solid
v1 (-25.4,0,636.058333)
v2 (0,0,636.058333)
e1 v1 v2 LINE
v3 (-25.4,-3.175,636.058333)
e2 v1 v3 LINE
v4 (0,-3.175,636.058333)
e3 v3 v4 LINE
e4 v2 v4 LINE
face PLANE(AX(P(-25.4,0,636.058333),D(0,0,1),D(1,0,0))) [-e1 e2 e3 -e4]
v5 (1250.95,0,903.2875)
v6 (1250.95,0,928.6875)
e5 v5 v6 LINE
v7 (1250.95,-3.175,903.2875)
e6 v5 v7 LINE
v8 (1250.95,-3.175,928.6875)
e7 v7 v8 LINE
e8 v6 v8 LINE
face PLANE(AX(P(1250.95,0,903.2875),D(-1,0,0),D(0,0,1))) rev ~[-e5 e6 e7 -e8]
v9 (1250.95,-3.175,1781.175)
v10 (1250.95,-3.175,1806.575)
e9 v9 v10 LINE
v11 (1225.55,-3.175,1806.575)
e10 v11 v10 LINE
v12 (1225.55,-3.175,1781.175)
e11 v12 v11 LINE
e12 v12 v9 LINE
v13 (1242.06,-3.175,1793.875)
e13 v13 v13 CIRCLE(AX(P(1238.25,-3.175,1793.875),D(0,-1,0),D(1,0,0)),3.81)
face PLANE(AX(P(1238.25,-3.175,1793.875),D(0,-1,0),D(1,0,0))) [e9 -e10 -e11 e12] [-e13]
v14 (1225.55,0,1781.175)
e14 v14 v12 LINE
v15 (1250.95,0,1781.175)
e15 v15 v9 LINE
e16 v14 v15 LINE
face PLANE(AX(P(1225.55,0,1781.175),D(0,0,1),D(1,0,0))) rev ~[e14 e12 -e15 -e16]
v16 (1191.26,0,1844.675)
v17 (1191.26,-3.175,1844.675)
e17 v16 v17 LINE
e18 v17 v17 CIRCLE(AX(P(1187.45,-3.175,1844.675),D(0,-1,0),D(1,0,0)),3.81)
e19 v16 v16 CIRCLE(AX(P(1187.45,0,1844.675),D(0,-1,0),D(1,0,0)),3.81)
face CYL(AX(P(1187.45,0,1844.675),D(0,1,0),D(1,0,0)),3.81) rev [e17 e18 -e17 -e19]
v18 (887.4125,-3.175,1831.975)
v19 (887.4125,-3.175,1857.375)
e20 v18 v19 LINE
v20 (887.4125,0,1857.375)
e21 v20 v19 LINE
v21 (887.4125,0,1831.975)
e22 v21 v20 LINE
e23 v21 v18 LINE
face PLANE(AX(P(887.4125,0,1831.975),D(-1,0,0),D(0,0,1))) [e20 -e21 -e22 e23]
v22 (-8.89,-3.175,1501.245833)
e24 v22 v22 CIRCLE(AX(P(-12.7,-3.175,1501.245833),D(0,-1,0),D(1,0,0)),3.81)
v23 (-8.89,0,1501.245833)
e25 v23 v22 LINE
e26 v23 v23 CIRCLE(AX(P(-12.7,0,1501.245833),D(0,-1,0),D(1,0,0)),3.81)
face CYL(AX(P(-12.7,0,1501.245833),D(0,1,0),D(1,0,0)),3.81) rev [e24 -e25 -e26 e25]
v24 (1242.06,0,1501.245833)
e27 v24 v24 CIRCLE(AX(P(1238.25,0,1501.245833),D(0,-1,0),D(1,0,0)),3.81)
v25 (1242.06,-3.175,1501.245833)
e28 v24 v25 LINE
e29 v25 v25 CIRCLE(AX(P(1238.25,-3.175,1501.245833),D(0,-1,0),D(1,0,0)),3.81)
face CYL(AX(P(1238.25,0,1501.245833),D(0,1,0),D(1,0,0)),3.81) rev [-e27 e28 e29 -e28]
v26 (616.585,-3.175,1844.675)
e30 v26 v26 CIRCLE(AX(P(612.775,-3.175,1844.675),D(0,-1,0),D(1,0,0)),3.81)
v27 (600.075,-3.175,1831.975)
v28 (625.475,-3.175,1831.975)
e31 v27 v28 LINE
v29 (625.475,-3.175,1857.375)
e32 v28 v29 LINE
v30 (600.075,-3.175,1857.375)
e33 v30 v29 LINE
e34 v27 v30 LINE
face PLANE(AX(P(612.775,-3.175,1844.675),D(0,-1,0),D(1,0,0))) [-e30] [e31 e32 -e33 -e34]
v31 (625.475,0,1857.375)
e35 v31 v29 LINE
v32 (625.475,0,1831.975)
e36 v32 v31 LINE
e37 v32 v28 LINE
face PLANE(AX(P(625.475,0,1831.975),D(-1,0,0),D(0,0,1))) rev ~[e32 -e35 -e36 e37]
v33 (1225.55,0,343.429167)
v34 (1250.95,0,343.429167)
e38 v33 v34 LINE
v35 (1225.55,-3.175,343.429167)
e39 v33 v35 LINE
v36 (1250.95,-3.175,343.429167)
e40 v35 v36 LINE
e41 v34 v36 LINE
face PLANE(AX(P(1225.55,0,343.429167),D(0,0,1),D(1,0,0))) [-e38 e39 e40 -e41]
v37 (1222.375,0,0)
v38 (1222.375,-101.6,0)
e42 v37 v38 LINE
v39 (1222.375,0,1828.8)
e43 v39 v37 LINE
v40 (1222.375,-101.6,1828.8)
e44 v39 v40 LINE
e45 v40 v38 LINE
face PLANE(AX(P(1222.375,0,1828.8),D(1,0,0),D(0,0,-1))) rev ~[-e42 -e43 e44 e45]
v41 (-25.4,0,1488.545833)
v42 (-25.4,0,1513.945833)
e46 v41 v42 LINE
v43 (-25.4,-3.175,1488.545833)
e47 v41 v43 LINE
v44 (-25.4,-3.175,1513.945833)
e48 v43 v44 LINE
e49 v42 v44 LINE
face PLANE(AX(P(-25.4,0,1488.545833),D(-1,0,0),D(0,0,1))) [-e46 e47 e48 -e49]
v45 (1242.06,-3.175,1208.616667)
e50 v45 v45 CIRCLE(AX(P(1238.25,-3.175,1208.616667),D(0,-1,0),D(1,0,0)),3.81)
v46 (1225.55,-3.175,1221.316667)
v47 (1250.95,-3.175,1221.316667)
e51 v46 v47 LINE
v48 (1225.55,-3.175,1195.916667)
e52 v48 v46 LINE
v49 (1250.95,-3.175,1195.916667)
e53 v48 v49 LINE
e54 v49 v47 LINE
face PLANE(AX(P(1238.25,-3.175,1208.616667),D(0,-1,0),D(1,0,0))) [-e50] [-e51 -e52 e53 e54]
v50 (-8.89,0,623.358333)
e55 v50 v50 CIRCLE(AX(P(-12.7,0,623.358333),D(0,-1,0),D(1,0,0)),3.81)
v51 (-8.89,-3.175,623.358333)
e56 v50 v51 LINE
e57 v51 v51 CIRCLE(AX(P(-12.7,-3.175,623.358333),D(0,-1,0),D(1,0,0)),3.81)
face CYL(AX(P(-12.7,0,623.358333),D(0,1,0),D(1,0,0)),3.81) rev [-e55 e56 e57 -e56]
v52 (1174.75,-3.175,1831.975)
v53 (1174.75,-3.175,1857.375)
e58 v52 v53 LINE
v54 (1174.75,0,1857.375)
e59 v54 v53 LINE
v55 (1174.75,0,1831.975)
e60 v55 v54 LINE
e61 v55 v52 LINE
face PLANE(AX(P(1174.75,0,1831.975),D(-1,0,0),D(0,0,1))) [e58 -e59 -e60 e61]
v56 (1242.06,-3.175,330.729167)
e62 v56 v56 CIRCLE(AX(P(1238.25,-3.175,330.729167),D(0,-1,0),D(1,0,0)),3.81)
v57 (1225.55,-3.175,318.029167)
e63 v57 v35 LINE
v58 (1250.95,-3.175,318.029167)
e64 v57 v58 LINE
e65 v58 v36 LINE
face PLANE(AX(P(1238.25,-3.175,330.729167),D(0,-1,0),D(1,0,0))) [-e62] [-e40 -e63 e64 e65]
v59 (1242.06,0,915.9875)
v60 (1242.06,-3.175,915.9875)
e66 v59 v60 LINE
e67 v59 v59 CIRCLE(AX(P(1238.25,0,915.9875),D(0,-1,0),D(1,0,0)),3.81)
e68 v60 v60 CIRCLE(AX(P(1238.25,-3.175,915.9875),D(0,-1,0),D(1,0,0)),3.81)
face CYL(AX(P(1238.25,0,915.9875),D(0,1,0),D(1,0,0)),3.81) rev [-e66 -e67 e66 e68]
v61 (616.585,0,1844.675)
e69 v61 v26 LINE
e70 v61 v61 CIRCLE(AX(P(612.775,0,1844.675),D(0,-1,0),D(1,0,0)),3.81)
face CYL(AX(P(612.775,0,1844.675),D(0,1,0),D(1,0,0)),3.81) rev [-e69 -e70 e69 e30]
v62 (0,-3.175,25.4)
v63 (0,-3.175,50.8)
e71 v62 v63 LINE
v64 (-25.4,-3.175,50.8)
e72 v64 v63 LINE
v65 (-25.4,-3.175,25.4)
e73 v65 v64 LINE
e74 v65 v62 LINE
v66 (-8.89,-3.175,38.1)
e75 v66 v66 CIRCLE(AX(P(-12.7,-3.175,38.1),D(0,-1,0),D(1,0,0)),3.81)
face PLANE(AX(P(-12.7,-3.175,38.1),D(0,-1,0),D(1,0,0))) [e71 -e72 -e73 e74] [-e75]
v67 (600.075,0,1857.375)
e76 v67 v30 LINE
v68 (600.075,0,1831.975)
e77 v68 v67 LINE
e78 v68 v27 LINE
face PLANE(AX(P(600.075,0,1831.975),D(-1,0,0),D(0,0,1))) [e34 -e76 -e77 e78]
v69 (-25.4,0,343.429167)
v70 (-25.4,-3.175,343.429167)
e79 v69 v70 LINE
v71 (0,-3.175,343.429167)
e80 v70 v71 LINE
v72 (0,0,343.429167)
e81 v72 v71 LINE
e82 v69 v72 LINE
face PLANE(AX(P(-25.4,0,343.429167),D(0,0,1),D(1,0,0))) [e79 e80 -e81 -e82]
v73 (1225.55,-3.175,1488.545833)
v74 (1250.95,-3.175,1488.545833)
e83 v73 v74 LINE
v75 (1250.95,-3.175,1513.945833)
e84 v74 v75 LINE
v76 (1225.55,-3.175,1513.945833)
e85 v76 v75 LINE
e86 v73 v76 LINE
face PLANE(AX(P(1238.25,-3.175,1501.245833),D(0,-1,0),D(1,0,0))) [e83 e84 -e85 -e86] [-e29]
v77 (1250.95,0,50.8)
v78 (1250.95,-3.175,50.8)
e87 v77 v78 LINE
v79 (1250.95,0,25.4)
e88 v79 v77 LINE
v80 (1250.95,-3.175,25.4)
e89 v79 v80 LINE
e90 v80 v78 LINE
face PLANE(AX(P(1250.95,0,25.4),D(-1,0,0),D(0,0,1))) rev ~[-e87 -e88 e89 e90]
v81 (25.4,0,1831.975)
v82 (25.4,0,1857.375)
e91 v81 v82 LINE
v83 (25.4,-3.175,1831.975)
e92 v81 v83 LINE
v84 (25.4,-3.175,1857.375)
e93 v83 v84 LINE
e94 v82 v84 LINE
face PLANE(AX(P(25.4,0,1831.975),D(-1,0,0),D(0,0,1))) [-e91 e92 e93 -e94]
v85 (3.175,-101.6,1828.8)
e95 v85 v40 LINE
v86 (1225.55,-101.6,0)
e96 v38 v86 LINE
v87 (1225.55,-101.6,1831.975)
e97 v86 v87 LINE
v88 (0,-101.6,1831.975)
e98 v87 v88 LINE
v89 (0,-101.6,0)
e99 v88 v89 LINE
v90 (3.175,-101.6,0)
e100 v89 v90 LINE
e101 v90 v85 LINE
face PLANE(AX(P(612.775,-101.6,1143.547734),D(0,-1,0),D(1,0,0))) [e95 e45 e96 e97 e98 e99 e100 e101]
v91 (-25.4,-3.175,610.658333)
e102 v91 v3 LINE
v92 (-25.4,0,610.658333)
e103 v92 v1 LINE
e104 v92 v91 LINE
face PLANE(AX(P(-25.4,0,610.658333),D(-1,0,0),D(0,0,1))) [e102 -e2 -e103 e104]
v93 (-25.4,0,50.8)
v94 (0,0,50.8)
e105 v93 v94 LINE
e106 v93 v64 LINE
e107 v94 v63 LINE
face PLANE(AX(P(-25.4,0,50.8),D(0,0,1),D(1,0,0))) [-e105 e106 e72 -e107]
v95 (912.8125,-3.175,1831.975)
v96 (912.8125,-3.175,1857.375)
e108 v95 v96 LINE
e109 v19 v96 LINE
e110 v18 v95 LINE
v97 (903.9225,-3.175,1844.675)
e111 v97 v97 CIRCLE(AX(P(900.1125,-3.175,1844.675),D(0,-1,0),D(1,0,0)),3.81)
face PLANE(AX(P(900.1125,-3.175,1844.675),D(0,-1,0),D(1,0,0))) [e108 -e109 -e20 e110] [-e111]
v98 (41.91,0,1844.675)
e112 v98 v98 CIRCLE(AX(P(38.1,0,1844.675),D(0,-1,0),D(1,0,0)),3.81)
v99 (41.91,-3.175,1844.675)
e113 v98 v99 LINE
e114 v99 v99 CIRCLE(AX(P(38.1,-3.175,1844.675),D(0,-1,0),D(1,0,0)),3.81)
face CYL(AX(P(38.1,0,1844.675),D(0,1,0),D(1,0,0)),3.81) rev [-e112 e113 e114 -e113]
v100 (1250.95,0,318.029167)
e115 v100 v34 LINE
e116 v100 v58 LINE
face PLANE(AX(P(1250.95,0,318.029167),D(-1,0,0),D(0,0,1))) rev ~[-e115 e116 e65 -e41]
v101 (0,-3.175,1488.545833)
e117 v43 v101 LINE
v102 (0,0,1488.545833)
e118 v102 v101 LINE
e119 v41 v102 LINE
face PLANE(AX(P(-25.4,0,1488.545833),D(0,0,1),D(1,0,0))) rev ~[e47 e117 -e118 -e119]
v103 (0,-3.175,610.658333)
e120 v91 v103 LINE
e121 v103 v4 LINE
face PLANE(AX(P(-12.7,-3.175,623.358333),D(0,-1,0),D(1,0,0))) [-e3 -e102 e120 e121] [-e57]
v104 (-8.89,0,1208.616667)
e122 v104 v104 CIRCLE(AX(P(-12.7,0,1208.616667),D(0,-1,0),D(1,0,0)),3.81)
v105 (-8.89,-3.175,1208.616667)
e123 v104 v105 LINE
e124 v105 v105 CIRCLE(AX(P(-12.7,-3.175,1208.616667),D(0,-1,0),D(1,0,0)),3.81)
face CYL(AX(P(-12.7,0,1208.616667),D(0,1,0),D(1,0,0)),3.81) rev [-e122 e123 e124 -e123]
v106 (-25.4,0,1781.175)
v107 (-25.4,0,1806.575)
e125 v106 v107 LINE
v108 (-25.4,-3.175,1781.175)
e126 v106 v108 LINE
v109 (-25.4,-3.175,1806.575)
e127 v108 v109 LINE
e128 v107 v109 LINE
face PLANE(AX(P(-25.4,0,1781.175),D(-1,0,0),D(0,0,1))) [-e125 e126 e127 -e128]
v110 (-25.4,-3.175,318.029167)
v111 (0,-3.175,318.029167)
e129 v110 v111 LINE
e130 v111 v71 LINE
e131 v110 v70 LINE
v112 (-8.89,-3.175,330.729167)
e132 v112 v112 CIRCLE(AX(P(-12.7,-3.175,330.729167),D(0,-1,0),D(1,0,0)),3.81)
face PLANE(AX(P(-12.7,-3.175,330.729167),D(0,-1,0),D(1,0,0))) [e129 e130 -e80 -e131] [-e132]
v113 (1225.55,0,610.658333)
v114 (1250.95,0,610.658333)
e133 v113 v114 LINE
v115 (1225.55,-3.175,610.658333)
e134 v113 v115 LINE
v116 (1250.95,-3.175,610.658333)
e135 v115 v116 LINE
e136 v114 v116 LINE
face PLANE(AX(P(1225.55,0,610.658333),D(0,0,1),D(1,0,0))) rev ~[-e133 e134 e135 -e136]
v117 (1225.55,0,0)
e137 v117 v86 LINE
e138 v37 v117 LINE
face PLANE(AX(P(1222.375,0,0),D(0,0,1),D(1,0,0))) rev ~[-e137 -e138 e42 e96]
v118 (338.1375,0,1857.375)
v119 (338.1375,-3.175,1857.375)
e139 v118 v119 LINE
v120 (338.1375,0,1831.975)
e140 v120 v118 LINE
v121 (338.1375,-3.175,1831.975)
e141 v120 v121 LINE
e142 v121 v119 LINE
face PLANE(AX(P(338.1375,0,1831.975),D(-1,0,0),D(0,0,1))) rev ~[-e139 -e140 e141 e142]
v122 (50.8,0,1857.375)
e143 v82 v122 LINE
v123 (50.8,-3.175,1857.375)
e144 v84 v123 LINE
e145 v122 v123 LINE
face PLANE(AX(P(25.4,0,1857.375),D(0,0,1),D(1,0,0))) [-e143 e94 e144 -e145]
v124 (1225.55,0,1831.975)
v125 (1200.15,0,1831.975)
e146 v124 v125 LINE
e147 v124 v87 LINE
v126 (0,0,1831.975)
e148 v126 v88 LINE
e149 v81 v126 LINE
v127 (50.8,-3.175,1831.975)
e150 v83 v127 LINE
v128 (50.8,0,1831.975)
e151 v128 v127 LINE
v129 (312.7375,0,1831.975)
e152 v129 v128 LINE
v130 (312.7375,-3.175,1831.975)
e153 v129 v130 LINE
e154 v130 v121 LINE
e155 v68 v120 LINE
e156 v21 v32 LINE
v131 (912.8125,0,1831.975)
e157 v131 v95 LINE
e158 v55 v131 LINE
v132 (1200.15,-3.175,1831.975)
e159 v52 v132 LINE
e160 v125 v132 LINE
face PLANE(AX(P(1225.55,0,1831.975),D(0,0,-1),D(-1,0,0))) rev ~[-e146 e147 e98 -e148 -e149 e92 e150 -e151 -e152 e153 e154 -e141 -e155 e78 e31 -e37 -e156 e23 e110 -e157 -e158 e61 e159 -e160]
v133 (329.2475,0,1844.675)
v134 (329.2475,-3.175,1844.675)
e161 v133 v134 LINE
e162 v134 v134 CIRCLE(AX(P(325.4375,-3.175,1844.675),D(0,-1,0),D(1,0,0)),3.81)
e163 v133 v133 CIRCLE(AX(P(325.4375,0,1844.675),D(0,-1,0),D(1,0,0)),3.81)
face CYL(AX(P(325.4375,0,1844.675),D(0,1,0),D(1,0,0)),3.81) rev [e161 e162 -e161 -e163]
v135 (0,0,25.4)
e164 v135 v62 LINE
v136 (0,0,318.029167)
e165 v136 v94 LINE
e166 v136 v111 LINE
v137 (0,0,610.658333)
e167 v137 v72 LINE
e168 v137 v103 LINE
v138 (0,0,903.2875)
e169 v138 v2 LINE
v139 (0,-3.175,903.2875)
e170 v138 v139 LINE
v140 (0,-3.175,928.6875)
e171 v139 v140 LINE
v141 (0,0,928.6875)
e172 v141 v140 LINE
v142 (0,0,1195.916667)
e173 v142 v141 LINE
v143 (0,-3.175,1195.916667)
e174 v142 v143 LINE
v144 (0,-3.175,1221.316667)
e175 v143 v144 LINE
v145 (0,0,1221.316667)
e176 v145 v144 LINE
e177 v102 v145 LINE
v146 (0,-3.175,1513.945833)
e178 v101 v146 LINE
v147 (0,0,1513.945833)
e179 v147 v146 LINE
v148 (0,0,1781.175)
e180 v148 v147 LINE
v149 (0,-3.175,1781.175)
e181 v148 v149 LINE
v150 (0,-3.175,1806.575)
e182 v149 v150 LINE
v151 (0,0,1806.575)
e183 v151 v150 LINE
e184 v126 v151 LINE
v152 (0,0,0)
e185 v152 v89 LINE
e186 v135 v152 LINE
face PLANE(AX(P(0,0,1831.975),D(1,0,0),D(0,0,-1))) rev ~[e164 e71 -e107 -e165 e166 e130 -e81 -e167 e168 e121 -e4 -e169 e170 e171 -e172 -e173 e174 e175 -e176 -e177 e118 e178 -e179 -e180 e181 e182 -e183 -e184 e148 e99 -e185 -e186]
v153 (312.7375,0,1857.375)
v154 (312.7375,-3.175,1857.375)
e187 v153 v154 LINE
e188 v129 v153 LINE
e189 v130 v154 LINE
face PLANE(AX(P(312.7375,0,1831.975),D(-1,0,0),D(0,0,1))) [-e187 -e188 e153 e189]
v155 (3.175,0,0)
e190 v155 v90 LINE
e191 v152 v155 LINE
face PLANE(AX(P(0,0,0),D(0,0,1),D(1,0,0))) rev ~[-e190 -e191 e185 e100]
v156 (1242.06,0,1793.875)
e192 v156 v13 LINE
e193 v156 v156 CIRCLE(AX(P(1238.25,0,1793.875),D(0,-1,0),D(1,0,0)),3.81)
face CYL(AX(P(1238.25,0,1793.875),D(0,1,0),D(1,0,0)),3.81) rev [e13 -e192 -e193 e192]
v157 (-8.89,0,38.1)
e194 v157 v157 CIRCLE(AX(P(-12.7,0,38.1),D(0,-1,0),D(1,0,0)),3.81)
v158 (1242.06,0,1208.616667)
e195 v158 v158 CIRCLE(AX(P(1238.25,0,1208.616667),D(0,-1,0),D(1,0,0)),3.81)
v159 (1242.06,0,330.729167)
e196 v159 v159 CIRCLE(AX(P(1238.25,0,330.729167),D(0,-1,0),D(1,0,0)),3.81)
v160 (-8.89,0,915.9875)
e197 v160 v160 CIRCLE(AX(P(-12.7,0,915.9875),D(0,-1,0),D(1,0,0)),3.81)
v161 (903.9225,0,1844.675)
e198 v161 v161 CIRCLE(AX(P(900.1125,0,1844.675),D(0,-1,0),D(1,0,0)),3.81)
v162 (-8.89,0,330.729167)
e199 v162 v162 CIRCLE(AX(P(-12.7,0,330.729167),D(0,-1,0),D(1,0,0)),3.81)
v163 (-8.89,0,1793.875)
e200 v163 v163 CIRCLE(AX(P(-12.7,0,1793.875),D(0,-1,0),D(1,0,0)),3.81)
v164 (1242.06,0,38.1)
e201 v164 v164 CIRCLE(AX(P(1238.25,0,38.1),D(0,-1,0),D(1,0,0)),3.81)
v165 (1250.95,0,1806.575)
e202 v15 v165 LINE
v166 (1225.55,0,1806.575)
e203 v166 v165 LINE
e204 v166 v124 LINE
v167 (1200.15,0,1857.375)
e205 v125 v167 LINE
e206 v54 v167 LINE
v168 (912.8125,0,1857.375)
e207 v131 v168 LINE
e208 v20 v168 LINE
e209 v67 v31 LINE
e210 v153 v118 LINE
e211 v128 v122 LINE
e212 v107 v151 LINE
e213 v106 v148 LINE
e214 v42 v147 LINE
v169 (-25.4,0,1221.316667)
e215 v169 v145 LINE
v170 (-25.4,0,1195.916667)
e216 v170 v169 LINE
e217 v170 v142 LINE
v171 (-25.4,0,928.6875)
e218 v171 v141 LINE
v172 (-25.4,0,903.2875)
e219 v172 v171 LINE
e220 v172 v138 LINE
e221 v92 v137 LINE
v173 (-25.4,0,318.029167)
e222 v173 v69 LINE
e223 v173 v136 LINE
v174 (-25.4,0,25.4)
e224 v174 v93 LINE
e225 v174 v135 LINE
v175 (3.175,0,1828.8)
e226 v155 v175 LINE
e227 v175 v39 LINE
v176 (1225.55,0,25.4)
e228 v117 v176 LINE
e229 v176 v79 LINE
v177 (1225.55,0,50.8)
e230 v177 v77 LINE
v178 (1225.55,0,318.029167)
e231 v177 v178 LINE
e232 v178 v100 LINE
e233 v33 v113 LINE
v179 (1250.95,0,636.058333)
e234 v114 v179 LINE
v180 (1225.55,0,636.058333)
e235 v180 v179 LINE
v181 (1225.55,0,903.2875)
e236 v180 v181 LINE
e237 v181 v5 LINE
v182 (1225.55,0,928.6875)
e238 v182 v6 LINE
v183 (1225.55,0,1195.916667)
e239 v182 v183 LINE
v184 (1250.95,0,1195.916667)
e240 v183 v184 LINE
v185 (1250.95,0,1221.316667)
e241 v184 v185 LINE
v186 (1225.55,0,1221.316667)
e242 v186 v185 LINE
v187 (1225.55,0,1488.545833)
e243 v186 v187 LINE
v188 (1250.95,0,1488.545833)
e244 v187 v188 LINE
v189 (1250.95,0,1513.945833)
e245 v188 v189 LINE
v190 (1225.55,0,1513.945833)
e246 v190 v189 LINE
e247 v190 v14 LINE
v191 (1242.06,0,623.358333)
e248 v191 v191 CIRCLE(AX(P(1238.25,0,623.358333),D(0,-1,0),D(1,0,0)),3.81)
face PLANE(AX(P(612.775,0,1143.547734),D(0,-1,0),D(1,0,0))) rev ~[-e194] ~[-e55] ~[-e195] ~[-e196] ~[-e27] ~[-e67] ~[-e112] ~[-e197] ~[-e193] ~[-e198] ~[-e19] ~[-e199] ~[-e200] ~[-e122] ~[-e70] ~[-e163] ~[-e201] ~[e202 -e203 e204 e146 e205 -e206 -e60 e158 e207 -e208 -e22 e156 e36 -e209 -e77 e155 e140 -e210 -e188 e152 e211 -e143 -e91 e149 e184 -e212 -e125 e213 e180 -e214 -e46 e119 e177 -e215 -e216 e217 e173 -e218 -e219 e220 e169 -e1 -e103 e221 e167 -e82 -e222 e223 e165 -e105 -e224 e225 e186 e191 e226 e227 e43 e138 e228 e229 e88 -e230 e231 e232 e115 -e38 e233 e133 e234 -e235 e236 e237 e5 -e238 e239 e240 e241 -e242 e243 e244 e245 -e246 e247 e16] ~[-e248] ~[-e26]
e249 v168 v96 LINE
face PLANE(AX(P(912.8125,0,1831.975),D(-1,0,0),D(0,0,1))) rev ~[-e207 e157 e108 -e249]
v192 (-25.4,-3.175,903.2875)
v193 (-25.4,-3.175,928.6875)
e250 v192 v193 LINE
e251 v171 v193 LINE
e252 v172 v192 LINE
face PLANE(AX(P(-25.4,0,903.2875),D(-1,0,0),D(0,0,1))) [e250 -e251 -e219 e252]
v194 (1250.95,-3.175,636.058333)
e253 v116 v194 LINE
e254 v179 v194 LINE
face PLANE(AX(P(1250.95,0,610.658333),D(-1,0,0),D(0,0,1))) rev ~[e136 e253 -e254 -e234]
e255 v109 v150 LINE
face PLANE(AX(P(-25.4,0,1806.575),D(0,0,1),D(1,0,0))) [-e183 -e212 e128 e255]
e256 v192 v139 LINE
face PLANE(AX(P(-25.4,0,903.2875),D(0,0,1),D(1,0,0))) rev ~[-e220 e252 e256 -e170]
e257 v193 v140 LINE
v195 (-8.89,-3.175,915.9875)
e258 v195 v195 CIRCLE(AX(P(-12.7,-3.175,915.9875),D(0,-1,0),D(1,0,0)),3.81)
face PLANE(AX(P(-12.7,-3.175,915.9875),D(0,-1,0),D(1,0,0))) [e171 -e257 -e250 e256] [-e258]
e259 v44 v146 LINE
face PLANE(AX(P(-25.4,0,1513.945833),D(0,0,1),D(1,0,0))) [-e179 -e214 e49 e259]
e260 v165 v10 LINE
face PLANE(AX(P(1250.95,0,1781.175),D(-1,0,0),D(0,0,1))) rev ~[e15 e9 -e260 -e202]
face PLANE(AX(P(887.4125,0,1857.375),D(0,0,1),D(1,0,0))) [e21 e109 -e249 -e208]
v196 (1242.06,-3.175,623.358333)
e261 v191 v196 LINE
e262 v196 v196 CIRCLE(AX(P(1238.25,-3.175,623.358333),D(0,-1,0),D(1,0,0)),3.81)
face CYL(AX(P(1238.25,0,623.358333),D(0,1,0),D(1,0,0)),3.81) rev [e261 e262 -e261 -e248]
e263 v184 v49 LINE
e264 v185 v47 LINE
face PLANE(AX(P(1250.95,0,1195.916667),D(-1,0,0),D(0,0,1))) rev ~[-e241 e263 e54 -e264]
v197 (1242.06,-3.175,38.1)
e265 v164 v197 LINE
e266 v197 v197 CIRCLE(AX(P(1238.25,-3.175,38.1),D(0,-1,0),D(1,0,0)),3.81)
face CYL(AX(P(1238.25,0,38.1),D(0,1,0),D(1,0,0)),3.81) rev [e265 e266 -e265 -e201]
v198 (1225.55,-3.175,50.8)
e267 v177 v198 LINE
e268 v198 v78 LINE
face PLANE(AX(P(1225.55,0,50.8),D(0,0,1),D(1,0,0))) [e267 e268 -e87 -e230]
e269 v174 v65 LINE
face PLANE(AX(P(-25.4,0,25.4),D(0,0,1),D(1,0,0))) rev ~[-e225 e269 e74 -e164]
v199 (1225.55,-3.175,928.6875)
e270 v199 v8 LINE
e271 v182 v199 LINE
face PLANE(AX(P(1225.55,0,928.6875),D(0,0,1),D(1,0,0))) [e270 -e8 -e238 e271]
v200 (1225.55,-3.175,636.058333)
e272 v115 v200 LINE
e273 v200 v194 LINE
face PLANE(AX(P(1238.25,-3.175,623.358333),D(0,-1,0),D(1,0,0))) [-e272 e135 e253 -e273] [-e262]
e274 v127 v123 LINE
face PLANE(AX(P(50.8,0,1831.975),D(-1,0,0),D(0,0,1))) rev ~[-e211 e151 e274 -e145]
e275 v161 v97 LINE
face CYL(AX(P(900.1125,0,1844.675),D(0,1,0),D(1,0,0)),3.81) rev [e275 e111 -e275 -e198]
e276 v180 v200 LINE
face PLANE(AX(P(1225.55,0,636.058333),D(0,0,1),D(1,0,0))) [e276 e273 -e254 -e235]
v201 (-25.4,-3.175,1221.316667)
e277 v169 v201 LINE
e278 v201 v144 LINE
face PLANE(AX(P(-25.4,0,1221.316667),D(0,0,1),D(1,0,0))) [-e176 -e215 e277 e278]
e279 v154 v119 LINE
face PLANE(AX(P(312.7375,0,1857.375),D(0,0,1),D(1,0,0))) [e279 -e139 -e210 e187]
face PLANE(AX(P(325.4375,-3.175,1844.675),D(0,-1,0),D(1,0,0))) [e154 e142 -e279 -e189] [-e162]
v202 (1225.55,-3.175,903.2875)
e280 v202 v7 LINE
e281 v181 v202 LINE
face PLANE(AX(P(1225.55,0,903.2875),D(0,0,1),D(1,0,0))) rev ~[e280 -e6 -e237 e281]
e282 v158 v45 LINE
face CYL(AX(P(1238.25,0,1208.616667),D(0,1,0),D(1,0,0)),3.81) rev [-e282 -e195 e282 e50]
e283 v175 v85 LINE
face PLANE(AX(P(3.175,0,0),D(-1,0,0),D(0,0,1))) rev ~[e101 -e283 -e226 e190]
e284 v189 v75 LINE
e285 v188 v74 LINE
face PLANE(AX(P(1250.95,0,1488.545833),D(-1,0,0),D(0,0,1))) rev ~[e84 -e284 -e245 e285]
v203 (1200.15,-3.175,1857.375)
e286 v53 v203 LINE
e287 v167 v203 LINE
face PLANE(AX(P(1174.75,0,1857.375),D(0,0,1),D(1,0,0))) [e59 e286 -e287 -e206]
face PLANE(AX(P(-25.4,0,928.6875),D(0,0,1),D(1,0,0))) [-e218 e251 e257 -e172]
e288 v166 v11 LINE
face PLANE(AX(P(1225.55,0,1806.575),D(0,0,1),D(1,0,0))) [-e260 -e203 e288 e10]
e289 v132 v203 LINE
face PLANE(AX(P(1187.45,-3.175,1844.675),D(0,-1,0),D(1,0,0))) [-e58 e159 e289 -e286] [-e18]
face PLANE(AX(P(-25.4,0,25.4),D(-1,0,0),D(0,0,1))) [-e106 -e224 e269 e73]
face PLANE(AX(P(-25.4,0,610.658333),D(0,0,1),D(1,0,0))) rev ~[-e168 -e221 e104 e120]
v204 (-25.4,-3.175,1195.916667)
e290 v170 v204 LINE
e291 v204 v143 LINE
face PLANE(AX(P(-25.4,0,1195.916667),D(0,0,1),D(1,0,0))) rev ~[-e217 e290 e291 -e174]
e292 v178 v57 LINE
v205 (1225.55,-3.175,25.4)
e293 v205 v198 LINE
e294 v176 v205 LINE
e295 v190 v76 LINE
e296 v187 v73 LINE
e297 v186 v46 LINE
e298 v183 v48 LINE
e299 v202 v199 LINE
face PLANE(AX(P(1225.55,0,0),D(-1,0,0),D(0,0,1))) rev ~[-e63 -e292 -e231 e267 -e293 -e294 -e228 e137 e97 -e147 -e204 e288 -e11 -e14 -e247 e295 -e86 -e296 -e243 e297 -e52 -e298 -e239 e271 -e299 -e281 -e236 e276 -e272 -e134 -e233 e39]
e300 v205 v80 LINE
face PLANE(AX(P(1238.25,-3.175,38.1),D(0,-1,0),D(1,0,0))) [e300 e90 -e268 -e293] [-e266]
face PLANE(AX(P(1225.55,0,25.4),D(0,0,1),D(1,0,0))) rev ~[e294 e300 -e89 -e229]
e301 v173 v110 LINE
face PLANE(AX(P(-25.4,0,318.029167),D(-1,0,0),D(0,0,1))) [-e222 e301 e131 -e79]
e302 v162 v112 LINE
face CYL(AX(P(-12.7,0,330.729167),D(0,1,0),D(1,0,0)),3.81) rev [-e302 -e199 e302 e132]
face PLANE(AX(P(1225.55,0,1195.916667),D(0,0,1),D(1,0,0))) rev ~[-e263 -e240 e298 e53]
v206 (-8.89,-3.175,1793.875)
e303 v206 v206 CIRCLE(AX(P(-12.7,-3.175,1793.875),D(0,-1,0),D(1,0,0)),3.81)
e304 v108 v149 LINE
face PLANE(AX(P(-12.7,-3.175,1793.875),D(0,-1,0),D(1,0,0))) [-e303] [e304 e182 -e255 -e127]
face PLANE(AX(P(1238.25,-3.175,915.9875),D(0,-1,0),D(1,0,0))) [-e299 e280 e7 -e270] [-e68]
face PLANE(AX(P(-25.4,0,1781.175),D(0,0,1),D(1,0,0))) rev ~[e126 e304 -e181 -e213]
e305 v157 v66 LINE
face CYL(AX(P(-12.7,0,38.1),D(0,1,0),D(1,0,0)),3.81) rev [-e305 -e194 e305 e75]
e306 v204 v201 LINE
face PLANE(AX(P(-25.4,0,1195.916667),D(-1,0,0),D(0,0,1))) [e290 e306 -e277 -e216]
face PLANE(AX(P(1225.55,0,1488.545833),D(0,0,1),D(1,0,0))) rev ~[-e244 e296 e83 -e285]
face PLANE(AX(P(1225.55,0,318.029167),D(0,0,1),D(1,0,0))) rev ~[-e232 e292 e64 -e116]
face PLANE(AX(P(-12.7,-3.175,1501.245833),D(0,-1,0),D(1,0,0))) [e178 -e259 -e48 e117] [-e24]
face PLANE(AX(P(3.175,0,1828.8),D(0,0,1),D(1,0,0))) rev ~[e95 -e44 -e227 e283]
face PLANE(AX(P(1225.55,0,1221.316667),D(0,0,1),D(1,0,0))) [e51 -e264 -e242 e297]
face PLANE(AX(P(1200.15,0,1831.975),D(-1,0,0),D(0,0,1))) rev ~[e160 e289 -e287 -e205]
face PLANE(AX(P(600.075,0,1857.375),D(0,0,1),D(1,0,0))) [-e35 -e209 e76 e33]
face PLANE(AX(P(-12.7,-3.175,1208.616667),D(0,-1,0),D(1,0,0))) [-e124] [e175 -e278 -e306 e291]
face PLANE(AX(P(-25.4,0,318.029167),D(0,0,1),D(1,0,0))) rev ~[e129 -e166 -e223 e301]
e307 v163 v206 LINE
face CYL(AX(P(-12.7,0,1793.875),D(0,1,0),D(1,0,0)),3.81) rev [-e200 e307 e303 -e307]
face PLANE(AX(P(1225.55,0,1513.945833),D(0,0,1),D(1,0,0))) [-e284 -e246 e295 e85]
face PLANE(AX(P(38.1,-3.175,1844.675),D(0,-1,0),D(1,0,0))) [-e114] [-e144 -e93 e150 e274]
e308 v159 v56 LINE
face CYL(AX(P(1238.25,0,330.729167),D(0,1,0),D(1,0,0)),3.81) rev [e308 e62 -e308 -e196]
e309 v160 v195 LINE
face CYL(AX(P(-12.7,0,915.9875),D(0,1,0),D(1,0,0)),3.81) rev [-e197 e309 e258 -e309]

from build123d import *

# Parameters (mm, degrees)
F1_DEPTH = 101.6
F0_W     = 25.4
F0_H     = 25.4
F0_R     = 3.81
F2_DEPTH = 3.175


# Not quite as in the source:
# - a feature names something its author has since deleted; it is built from what else it names


with BuildPart() as f1:
    # F0 (on Front) → F1 (new body)
    with BuildSketch(Plane.XZ):
        Polygon((0, 25.4), (0, 0), (3.175, 0), (3.175, 1828.8), (1222.375, 1828.8), (1222.375, 0), (1225.55, 0), (1225.55, 25.4), (1225.55, 50.8), (1225.55, 318.0291666667), (1225.55, 343.4291666667), (1225.55, 610.6583333333), (1225.55, 636.0583333333), (1225.55, 903.2875), (1225.55, 928.6875), (1225.55, 1195.9166666667), (1225.55, 1221.3166666667), (1225.55, 1488.5458333333), (1225.55, 1513.9458333333), (1225.55, 1781.175), (1225.55, 1806.575), (1225.55, 1831.975), (1200.15, 1831.975), (1174.75, 1831.975), (912.8125, 1831.975), (887.4125, 1831.975), (625.475, 1831.975), (600.075, 1831.975), (338.1375, 1831.975), (312.7375, 1831.975), (50.8, 1831.975), (25.4, 1831.975), (0, 1831.975), (0, 1806.575), (0, 1781.175), (0, 1513.9458333333), (0, 1488.5458333333), (0, 1221.3166666667), (0, 1195.9166666667), (0, 928.6875), (0, 903.2875), (0, 636.0583333333), (0, 610.6583333333), (0, 343.4291666667), (0, 318.0291666667), (0, 50.8), align=None)
    extrude(amount=F1_DEPTH)

    # F0 (on Front) → F2 (join)
    with BuildSketch(Plane.XZ):
        with Locations((-12.7, 38.1)):
            Rectangle(F0_W, F0_H)
        with Locations((-12.7, 38.1)):
            Circle(F0_R, mode=Mode.SUBTRACT)
        with Locations((-12.7, 330.7291666667)):
            Rectangle(F0_W, F0_H)
        with Locations((-12.7, 330.7291666667)):
            Circle(F0_R, mode=Mode.SUBTRACT)
        with Locations((-12.7, 623.3583333333)):
            Rectangle(F0_W, F0_H)
        with Locations((-12.7, 623.3583333333)):
            Circle(F0_R, mode=Mode.SUBTRACT)
        with Locations((1238.25, 38.1)):
            Rectangle(F0_W, F0_H)
        with Locations((1238.25, 38.1)):
            Circle(F0_R, mode=Mode.SUBTRACT)
        with Locations((-12.7, 915.9875)):
            Rectangle(F0_W, F0_H)
        with Locations((-12.7, 915.9875)):
            Circle(F0_R, mode=Mode.SUBTRACT)
        with Locations((1238.25, 330.7291666667)):
            Rectangle(F0_W, F0_H)
        with Locations((1238.25, 330.7291666667)):
            Circle(F0_R, mode=Mode.SUBTRACT)
        with Locations((-12.7, 1208.6166666667)):
            Rectangle(F0_W, F0_H)
        with Locations((-12.7, 1208.6166666667)):
            Circle(F0_R, mode=Mode.SUBTRACT)
        with Locations((1238.25, 623.3583333333)):
            Rectangle(F0_W, F0_H)
        with Locations((1238.25, 623.3583333333)):
            Circle(F0_R, mode=Mode.SUBTRACT)
        with Locations((-12.7, 1501.2458333333)):
            Rectangle(F0_W, F0_H)
        with Locations((-12.7, 1501.2458333333)):
            Circle(F0_R, mode=Mode.SUBTRACT)
        with Locations((1238.25, 915.9875)):
            Rectangle(F0_W, F0_H)
        with Locations((1238.25, 915.9875)):
            Circle(F0_R, mode=Mode.SUBTRACT)
        with Locations((-12.7, 1793.875)):
            Rectangle(F0_W, F0_H)
        with Locations((-12.7, 1793.875)):
            Circle(F0_R, mode=Mode.SUBTRACT)
        with Locations((1238.25, 1208.6166666667)):
            Rectangle(F0_W, F0_H)
        with Locations((1238.25, 1208.6166666667)):
            Circle(F0_R, mode=Mode.SUBTRACT)
        with Locations((38.1, 1844.675)):
            Rectangle(F0_W, F0_H)
        with Locations((38.1, 1844.675)):
            Circle(F0_R, mode=Mode.SUBTRACT)
        with Locations((1238.25, 1501.2458333333)):
            Rectangle(F0_W, F0_H)
        with Locations((1238.25, 1501.2458333333)):
            Circle(F0_R, mode=Mode.SUBTRACT)
        with Locations((325.4375, 1844.675)):
            Rectangle(F0_W, F0_H)
        with Locations((325.4375, 1844.675)):
            Circle(F0_R, mode=Mode.SUBTRACT)
        with Locations((1238.25, 1793.875)):
            Rectangle(F0_W, F0_H)
        with Locations((1238.25, 1793.875)):
            Circle(F0_R, mode=Mode.SUBTRACT)
        with Locations((612.775, 1844.675)):
            Rectangle(F0_W, F0_H)
        with Locations((612.775, 1844.675)):
            Circle(F0_R, mode=Mode.SUBTRACT)
        with Locations((1187.45, 1844.675)):
            Rectangle(F0_W, F0_H)
        with Locations((1187.45, 1844.675)):
            Circle(F0_R, mode=Mode.SUBTRACT)
        with Locations((900.1125, 1844.675)):
            Rectangle(F0_W, F0_H)
        with Locations((900.1125, 1844.675)):
            Circle(F0_R, mode=Mode.SUBTRACT)
    extrude(amount=F2_DEPTH)


solid = f1.part
